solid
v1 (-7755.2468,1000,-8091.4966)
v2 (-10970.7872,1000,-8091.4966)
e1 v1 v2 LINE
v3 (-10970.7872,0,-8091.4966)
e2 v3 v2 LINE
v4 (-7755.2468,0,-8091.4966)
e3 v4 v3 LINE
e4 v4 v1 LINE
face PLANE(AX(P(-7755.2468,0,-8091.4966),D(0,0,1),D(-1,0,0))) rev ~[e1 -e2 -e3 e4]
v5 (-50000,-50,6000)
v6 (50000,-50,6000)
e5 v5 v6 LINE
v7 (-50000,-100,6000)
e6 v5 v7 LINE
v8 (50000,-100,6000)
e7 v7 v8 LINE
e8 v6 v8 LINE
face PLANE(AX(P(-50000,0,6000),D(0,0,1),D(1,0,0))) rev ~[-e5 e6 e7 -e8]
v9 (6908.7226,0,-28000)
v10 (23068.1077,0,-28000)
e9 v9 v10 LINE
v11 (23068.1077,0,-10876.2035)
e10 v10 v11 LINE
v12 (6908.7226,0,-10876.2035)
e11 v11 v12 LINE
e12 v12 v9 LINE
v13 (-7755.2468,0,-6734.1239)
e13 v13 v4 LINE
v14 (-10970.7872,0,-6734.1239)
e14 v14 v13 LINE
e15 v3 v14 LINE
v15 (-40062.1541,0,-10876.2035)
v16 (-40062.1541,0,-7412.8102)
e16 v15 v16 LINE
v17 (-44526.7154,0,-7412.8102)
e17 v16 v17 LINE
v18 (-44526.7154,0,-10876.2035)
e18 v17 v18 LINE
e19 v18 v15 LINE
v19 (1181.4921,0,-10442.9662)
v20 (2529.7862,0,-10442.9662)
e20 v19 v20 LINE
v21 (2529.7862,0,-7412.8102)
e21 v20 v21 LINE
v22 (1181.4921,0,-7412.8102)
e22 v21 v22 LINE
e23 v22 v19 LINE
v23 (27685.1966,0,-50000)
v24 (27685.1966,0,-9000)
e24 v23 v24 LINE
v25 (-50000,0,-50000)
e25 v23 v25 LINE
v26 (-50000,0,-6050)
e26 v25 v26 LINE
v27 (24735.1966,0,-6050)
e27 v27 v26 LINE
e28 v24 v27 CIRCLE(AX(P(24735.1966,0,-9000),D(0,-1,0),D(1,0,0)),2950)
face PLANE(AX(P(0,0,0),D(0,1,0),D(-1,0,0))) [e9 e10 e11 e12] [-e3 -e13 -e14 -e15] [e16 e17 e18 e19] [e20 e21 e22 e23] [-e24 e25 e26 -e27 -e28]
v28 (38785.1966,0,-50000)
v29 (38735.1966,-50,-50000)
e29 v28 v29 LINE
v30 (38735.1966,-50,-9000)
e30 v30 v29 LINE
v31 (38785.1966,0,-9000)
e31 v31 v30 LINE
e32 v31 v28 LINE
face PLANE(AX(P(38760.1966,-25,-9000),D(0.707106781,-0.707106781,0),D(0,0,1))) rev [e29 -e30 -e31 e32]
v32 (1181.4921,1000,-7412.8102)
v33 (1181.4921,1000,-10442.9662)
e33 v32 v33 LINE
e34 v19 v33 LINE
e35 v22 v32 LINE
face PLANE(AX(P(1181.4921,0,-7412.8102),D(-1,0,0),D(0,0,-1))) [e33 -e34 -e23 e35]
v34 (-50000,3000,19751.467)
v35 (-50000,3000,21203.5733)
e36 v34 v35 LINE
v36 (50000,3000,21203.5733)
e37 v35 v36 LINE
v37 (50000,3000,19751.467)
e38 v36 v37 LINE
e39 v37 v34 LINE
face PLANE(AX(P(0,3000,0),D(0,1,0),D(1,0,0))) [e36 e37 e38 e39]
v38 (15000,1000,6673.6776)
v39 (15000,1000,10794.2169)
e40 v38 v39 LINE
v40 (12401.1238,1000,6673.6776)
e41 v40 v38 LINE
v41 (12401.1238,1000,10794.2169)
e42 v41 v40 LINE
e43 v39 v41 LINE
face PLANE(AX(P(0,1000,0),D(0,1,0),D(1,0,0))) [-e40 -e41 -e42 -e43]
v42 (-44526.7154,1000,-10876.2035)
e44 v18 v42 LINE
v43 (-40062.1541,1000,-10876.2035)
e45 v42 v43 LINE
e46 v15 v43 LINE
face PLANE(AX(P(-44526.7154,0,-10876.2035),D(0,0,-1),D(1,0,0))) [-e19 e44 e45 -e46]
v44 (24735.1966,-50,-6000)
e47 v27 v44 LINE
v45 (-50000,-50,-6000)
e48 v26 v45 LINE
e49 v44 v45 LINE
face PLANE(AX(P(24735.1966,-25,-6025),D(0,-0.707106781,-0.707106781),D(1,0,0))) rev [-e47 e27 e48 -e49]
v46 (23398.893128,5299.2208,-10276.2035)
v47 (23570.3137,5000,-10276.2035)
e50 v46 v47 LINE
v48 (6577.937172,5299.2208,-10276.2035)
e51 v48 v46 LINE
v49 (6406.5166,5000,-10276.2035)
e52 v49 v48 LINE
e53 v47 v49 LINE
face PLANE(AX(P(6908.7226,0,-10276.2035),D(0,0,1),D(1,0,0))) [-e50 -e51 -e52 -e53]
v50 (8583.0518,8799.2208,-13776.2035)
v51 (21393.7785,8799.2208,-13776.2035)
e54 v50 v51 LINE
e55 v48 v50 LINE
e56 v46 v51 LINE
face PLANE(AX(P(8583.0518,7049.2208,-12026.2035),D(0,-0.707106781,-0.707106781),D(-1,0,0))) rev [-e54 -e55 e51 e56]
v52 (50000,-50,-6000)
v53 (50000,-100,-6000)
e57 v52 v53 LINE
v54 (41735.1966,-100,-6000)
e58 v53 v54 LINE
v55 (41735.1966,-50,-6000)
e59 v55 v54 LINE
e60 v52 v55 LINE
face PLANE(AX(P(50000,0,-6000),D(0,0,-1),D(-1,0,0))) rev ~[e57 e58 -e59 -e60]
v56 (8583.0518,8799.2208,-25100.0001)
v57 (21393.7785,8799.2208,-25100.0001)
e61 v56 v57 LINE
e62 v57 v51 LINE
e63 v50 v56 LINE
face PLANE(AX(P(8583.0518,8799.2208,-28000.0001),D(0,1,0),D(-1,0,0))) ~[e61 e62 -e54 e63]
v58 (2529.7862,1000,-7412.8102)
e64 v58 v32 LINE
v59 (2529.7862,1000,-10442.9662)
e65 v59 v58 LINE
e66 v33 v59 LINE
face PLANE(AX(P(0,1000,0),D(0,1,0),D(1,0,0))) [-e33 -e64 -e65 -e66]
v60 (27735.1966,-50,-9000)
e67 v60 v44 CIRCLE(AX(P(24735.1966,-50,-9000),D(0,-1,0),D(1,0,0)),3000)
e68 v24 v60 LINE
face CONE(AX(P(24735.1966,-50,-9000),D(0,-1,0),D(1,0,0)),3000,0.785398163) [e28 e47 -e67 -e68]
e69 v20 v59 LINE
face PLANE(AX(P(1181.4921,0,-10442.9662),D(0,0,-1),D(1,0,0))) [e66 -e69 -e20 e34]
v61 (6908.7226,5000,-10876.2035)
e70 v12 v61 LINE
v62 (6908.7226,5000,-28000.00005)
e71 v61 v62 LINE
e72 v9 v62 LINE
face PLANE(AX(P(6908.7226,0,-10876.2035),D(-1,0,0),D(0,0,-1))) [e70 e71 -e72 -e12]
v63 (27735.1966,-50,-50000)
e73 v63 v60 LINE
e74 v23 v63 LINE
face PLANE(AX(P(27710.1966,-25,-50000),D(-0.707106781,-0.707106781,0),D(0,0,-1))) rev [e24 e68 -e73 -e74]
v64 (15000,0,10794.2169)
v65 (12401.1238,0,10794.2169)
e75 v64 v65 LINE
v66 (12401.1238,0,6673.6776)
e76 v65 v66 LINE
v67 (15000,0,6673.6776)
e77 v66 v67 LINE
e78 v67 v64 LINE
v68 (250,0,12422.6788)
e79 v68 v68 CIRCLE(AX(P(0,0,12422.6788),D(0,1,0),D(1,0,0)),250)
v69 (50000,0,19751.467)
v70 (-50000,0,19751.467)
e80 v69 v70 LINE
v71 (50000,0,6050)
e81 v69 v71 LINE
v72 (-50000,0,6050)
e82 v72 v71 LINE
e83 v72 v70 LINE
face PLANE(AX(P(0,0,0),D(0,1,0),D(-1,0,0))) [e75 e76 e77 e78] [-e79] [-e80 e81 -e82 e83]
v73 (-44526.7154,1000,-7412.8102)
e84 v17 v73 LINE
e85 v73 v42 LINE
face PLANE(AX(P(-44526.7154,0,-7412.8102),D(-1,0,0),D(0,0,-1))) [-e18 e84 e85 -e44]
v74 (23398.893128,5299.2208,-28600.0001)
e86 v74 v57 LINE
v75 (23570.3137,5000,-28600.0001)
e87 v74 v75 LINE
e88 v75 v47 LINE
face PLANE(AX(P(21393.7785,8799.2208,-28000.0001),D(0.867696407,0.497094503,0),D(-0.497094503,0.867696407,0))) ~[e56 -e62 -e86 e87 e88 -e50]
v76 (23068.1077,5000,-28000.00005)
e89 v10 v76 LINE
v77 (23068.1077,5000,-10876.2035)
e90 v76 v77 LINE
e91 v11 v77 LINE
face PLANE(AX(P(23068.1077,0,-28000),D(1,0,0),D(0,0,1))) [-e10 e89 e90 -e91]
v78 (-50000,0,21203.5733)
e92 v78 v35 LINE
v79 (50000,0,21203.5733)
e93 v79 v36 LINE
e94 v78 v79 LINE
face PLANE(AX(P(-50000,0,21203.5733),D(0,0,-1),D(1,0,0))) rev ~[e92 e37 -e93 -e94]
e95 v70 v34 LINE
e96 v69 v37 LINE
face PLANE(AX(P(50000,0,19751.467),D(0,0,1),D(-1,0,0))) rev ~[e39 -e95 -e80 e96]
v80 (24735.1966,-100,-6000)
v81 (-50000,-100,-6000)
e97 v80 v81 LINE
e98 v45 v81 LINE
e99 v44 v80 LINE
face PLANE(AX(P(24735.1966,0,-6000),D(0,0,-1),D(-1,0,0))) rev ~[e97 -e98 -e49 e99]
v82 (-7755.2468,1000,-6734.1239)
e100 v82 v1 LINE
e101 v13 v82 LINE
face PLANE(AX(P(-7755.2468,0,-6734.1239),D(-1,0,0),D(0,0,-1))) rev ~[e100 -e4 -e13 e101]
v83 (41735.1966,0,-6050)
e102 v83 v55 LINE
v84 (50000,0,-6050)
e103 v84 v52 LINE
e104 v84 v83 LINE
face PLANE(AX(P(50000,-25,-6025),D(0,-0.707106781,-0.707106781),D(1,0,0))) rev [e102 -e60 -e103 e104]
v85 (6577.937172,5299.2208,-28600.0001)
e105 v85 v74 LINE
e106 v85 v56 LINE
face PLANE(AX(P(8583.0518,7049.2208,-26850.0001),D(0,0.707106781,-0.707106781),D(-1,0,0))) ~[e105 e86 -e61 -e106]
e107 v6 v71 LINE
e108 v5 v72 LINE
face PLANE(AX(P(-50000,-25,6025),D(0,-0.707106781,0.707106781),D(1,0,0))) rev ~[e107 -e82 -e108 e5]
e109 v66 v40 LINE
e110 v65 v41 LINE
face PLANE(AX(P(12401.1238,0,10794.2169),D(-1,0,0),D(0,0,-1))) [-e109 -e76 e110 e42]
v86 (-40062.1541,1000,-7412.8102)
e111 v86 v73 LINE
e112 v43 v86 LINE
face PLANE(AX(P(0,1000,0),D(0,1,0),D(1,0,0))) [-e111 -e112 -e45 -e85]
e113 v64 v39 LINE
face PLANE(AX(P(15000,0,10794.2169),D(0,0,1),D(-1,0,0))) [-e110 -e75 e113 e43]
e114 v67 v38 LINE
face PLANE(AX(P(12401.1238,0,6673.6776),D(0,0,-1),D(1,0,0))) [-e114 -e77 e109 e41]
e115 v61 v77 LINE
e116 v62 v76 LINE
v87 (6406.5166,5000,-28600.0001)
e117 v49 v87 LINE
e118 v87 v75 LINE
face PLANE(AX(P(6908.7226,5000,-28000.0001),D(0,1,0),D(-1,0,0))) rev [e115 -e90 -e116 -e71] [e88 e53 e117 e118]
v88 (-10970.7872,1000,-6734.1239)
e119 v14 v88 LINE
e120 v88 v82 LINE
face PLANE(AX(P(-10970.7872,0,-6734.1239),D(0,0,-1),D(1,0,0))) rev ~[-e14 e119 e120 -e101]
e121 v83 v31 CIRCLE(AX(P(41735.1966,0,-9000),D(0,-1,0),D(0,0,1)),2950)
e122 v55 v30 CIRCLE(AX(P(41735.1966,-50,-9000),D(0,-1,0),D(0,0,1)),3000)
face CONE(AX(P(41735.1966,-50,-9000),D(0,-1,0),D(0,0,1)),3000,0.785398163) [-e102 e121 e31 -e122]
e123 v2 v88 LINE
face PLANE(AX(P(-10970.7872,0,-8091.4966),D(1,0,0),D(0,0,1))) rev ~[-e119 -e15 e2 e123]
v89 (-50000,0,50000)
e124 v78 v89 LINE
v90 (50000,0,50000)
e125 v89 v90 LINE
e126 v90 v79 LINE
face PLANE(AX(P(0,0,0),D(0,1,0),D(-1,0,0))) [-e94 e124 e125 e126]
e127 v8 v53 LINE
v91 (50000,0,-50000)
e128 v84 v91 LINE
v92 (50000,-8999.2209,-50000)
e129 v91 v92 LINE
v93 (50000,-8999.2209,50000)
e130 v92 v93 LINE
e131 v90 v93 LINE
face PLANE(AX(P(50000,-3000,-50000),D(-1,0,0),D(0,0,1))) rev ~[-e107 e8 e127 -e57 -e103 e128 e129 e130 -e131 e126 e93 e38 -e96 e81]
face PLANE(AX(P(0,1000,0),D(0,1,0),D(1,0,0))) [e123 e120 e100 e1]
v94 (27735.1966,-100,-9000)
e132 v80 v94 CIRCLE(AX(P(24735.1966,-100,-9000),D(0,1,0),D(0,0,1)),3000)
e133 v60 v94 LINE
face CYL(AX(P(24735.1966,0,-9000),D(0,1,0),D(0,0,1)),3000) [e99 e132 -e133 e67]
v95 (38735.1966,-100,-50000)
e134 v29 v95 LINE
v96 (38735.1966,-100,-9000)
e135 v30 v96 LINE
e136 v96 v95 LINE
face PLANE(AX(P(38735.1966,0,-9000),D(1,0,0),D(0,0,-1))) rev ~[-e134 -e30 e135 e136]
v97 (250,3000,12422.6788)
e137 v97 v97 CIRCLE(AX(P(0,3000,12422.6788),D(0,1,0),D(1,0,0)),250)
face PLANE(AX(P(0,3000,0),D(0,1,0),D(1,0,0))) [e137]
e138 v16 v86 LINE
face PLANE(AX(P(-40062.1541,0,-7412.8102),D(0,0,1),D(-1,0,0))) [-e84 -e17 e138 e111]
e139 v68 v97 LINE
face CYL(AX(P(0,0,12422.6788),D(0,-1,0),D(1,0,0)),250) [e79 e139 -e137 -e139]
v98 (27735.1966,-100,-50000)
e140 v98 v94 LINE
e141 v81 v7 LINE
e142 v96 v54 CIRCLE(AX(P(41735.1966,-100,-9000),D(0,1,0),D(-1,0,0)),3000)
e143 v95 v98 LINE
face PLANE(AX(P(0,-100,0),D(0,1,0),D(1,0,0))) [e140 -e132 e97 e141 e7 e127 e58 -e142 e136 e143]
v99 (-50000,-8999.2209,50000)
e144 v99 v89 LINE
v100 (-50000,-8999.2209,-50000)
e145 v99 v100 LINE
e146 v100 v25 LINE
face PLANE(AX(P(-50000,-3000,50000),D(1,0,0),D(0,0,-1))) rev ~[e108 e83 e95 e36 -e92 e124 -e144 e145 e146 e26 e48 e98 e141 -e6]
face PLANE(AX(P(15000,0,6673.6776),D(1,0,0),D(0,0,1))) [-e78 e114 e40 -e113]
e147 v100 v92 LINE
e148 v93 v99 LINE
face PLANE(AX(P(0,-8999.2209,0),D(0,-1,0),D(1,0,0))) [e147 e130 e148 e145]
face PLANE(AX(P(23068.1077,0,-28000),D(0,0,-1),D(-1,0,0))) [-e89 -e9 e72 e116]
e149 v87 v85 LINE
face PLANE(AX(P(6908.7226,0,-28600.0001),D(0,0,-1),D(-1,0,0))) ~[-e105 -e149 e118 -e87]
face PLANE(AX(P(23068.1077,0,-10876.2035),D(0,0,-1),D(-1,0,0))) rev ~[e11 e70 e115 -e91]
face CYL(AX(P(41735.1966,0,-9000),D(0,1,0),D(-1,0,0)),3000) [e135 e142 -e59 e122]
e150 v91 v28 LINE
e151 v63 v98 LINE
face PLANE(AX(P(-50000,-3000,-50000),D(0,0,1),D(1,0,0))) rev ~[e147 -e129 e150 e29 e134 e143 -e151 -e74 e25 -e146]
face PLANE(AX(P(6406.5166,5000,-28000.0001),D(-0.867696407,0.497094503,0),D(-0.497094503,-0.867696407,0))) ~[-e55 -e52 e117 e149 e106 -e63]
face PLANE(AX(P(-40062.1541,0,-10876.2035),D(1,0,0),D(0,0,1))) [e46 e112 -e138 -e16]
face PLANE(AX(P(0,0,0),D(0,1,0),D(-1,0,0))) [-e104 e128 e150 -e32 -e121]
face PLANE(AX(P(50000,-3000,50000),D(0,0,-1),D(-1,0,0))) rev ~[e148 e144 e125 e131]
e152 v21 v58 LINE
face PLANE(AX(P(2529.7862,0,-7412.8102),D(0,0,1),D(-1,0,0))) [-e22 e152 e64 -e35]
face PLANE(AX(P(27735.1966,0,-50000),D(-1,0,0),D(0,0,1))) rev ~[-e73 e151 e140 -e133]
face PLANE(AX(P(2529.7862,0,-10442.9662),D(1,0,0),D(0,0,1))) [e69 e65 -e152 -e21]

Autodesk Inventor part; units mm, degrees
ref_plane "YZ Plane" through (0, 0, 0) normal (1, 0, 0) x (0, 1, 0)
ref_plane "XZ Plane" through (0, 0, 0) normal (0, 1, 0) x (-1, 0, 0)
sketch "Sketch1" plane through (0, 0, 0) normal (0, 1, 0) x (-1, 0, 0)
  line L0 (50000, 50000) -> (-50000, 50000)
  line L1 (-50000, 50000) -> (-50000, -50000)
  line L2 (-50000, -50000) -> (50000, -50000)
  line L3 (50000, -50000) -> (50000, 50000)
  line L4 (50000, 50000) -> (-50000, -50000) construction
  line L5 (-50000, 50000) -> (50000, -50000) construction
  point P0 (0, 0)
  dimension "d0" = 100000
  dimension "d1" = 100000
extrude "Extrusion1" add sketch "Sketch1" against normal blind 3000
sketch "Sketch2" plane through (0, 0, 0) normal (0, 1, 0) x (1, 0, 0)
  line L0 (50000, -50000) -> (50000, 50000) projected
  line L1 (50000, 50000) -> (-50000, 50000) projected
  line L2 (-50000, 50000) -> (-50000, -50000) projected
  line L3 (-50000, -50000) -> (50000, -50000) projected
  line L4 (50000, 50000) -> (50000, -50000) projected
  line L5 (-50000, -6000) -> (50000, -6000)
  line L6 (50000, -6000) -> (50000, 6000)
  line L7 (-50000, 6000) -> (-50000, -6000)
  line L8 (-50000, -6000) -> (50000, 6000) construction
  line L9 (50000, -6000) -> (-50000, 6000) construction
  line L10 (-50000, 50000) -> (50000, 50000) projected
  line L11 (38735.1966, 9000) -> (38735.1966, 50000)
  line L12 (38735.1966, 50000) -> (27735.1966, 50000)
  line L13 (27735.1966, 50000) -> (27735.1966, 9000)
  line L14 (50000, 6000) -> (41735.1966, 6000)
  line L15 (24735.1966, 6000) -> (-50000, 6000)
  arc A0 (24735.1966, 6000) -> (27735.1966, 9000) centre (24735.1966, 9000) ccw
  arc A1 (38735.1966, 9000) -> (41735.1966, 6000) centre (41735.1966, 9000) ccw
  point P0 (0, 0)
  dimension "d5" = 11000
  dimension "d6" = 3000
extrude "Extrusion2" cut sketch "Sketch2" against normal blind 100 contours L5 L2 L15 A0 L13 L1 L11 A1 L14 L0
sketch "Sketch3" plane through (0, 0, 0) normal (0, 1, 0) x (1, 0, 0)
  line L0 (50000, 50000) -> (50000, -50000) projected
  line L1 (50000, -50000) -> (-50000, -50000) projected
  line L2 (-50000, -50000) -> (-50000, 50000) projected
  line L3 (-50000, 50000) -> (50000, 50000) projected
  line L4 (-50000, 6000) -> (24735.1966, 6000) projected
  arc A0 (24735.1966, 6000) -> (27735.1966, 9000) centre (24735.1966, 9000) ccw projected
  line L5 (27735.1966, 9000) -> (27735.1966, 50000) projected
  line L6 (27735.1966, 50000) -> (-50000, 50000) projected
  line L7 (-50000, 50000) -> (-50000, 6000) projected
  line L8 (23068.1077, 10876.2035) -> (6908.7226, 10876.2035)
  line L9 (6908.7226, 10876.2035) -> (6908.7226, 28000)
  line L10 (6908.7226, 28000) -> (23068.1077, 28000)
  line L11 (23068.1077, 28000) -> (23068.1077, 10876.2035)
  line L12 (23068.1077, 10876.2035) -> (6908.7226, 28000) construction
  line L13 (6908.7226, 10876.2035) -> (23068.1077, 28000) construction
  point P0 (0, 0)
  point P1 (14988.4151, 19438.1018)
extrude "Extrusion3" add sketch "Sketch3" along normal blind 5000 contours L8 L9 L10 L11
sketch "Sketch4" plane through (23068.1077, 0, -28000) normal (0, 0, -1) x (-1, 0, 0)
  line L0 (16159.3851, 0) -> (0, 0) projected
  line L1 (16159.3851, 0) -> (16159.3851, 5000) projected
  line L2 (0, 5000) -> (16159.3851, 5000) projected
  line L3 (0, 0) -> (0, 5000) projected
  line L4 (0, 5000) -> (16159.3851, 5000) projected
  line L5 (0, 5000) -> (-502.206, 5000)
  line L6 (-502.206, 5000) -> (1674.3292, 8799.2208)
  line L7 (1674.3292, 8799.2208) -> (8079.6925, 8799.2208)
  line L8 (8079.6925, 5000) -> (8079.6925, 8799.2208)
  line L9 (16159.3851, 5000) -> (16661.5911, 5000)
  line L10 (16661.5911, 5000) -> (14485.0559, 8799.2208)
  line L11 (14485.0559, 8799.2208) -> (8079.6925, 8799.2208)
  point P0 (23068.1077, 0)
extrude "Extrusion4" add sketch "Sketch4" against normal up to surface (17123.7965 mm away) contours L2 L8 L11 L10 L9 | L5 L6 L7 L8 L2
sketch "Sketch5" plane through (6908.7226, 0, -10876.2035) normal (0, 0, 1) x (1, 0, 0)
  line L0 (16159.3851, 0) -> (0, 0) projected
  line L1 (16159.3851, 0) -> (16159.3851, 5000) projected
  line L2 (16661.5911, 5000) -> (16159.3851, 5000) projected
  line L3 (14485.0559, 8799.2208) -> (16661.5911, 5000) projected
  line L4 (1674.3292, 8799.2208) -> (14485.0559, 8799.2208) projected
  line L5 (-502.206, 5000) -> (1674.3292, 8799.2208) projected
  line L6 (0, 5000) -> (-502.206, 5000) projected
  line L7 (0, 0) -> (0, 5000) projected
  line L8 (0, 5000) -> (-502.206, 5000) projected
  line L9 (16661.5911, 5000) -> (16159.3851, 5000) projected
  line L10 (0, 5000) -> (16159.3851, 5000)
  point P0 (-6908.7226, 0)
extrude "Extrusion5" add sketch "Sketch5" along normal blind 600 contours L10 L6 L5 L4 L3 L2
ref_plane "Work Plane1" through (23068.1077, 0, -19438.1018) normal (0, 0, -1) x (-1, 0, 0)
mirror "Mirror1" about plane through (23068.1077, 0, -19438.1018) normal (0, 0, -1) of "Extrusion5"
chamfer "Chamfer1" distance 50 angle 45 7 edges at (-12632.4017, 0, -6000) (26856.517, 0, -6878.6797) (27735.1966, 0, -29500) (0, 0, 6000) (38735.1966, 0, -29500) (39613.8763, 0, -6878.6797) (45867.5983, 0, -6000)
chamfer "Chamfer2" distance 3500 angle 45 2 edges at (14988.4151, 8799.2208, -10276.2035) (14988.4151, 8799.2208, -28600)
sketch "Sketch6" plane through (0, 0, 0) normal (0, 1, 0) x (1, 0, 0)
  line L0 (-50000, -6050) -> (50000, -6050) projected
  line L1 (-50000, -6050) -> (-50000, -50000) projected
  line L2 (-50000, -50000) -> (50000, -50000) projected
  line L3 (50000, -50000) -> (50000, -6050) projected
  circle A0 centre (0, -12422.6788) radius 250
  point P0 (0, 0)
  dimension "d21" = 500
  dimension "d23" = 37577.3212
extrude "Extrusion6" add sketch "Sketch6" along normal blind 3000 contours A0
pattern_linear "Rectangular Pattern1" [suppressed]
sketch "Sketch7" plane through (0, 0, 0) normal (0, 1, 0) x (1, 0, 0)
  circle A0 centre (0, -12422.6788) radius 250 projected
  line L0 (-50000, -6050) -> (50000, -6050) projected
  line L1 (-50000, -6050) -> (-50000, -50000) projected
  line L2 (-50000, -50000) -> (50000, -50000) projected
  line L3 (50000, -50000) -> (50000, -6050) projected
  line L4 (-50000, -6050) -> (-50000, -50000) projected
  line L5 (50000, 50000) -> (50000, -50000) projected
  line L6 (-50000, -21203.5733) -> (50000, -21203.5733)
  line L7 (50000, -21203.5733) -> (50000, -19751.467)
  line L8 (50000, -19751.467) -> (-50000, -19751.467)
  line L9 (-50000, -19751.467) -> (-50000, -21203.5733)
  point P0 (0, 0)
  point P1 (-50000, -19751.467)
  point P2 (50000, -21203.5733)
extrude "Extrusion7" add sketch "Sketch7" along normal blind 3000 contours L8 L3 L6 L1
sketch "Sketch8" plane through (0, 0, 0) normal (0, 1, 0) x (1, 0, 0)
  line L0 (27685.1966, 50000) -> (27685.1966, 9000) projected
  line L1 (27685.1966, 50000) -> (-50000, 50000) projected
  line L2 (-50000, 50000) -> (-50000, 6050) projected
  line L3 (24735.1966, 6050) -> (-50000, 6050) projected
  arc A0 (24735.1966, 6050) -> (27685.1966, 9000) centre (24735.1966, 9000) ccw projected
  line L4 (23068.1077, 28000) -> (23068.1077, 10876.2035) projected
  line L5 (23068.1077, 10876.2035) -> (6908.7226, 10876.2035) projected
  line L6 (6908.7226, 10876.2035) -> (6908.7226, 28000) projected
  line L7 (6908.7226, 28000) -> (23068.1077, 28000) projected
  line L8 (-50000, -19751.467) -> (50000, -19751.467) projected
  line L9 (50000, -19751.467) -> (50000, -6050) projected
  line L10 (-50000, -6050) -> (50000, -6050) projected
  line L11 (-50000, -6050) -> (-50000, -19751.467) projected
  circle A1 centre (0, -12422.6788) radius 250 projected
  line L12 (-7755.2468, 8091.4966) -> (-10970.7872, 8091.4966)
  line L13 (-10970.7872, 8091.4966) -> (-10970.7872, 6734.1239)
  line L14 (-10970.7872, 6734.1239) -> (-7755.2468, 6734.1239)
  line L15 (-7755.2468, 6734.1239) -> (-7755.2468, 8091.4966)
  line L16 (-3927.8334, -1038.8233) -> (-1060.9343, -1038.8233)
  line L17 (-1060.9343, -1038.8233) -> (-1060.9343, -3437.3677)
  line L18 (-1060.9343, -3437.3677) -> (-3927.8334, -3437.3677)
  line L19 (-3927.8334, -3437.3677) -> (-3927.8334, -1038.8233)
  line L20 (-22605.2556, -1038.8233) -> (-21044.0729, -1038.8233)
  line L21 (-21044.0729, -1038.8233) -> (-21044.0729, -5069.5133)
  line L22 (-21044.0729, -5069.5133) -> (-22605.2556, -5069.5133)
  line L23 (-22605.2556, -5069.5133) -> (-22605.2556, -1038.8233)
  line L24 (1181.4921, 10442.9662) -> (2529.7862, 10442.9662)
  line L25 (2529.7862, 10442.9662) -> (2529.7862, 7412.8102)
  line L26 (2529.7862, 7412.8102) -> (1181.4921, 7412.8102)
  line L27 (1181.4921, 7412.8102) -> (1181.4921, 10442.9662)
  line L28 (-44526.7154, 10876.2035) -> (-40062.1541, 10876.2035)
  line L29 (-40062.1541, 10876.2035) -> (-40062.1541, 7412.8102)
  line L30 (-40062.1541, 7412.8102) -> (-44526.7154, 7412.8102)
  line L31 (-44526.7154, 7412.8102) -> (-44526.7154, 10876.2035)
  line L32 (12401.1238, -6673.6776) -> (15000, -6673.6776)
  line L33 (15000, -6673.6776) -> (15000, -10794.2169)
  line L34 (15000, -10794.2169) -> (12401.1238, -10794.2169)
  line L35 (12401.1238, -10794.2169) -> (12401.1238, -6673.6776)
  point P0 (0, 0)
extrude "Extrusion8" add sketch "Sketch8" along normal blind 1000 contours L15 L14 L13 L12 | L24 L25 L26 L27 | L28 L29 L30 L31 | L32 L33 L34 L35
sketch "Sketch9" plane through (0, 0, 0) normal (0, 1, 0) x (1, 0, 0)
  circle A0 centre (-7079.3551, -7895.0186) radius 1405.5966
  circle A1 centre (-3459.7598, 8393.1608) radius 825.3947
  circle A2 centre (15217.3522, 7567.766) radius 874.7148
  circle A3 centre (6747.4991, -9300.6152) radius 1543.0453
  point P0 (0, 0)
extrude "Extrusion9" [suppressed]
sketch "Sketch10" plane through (0, -3000, 0) normal (0, -1, 0) x (1, 0, 0)
  line L0 (50000, -50000) -> (50000, 50000) projected
  line L1 (50000, 50000) -> (-50000, 50000) projected
  line L2 (-50000, 50000) -> (-50000, -50000) projected
  line L3 (-50000, -50000) -> (50000, -50000) projected
  point P0 (0, 0)
extrude "Extrusion10" add sketch "Sketch10" along normal blind 5999.2209
properties part number "scene1"
